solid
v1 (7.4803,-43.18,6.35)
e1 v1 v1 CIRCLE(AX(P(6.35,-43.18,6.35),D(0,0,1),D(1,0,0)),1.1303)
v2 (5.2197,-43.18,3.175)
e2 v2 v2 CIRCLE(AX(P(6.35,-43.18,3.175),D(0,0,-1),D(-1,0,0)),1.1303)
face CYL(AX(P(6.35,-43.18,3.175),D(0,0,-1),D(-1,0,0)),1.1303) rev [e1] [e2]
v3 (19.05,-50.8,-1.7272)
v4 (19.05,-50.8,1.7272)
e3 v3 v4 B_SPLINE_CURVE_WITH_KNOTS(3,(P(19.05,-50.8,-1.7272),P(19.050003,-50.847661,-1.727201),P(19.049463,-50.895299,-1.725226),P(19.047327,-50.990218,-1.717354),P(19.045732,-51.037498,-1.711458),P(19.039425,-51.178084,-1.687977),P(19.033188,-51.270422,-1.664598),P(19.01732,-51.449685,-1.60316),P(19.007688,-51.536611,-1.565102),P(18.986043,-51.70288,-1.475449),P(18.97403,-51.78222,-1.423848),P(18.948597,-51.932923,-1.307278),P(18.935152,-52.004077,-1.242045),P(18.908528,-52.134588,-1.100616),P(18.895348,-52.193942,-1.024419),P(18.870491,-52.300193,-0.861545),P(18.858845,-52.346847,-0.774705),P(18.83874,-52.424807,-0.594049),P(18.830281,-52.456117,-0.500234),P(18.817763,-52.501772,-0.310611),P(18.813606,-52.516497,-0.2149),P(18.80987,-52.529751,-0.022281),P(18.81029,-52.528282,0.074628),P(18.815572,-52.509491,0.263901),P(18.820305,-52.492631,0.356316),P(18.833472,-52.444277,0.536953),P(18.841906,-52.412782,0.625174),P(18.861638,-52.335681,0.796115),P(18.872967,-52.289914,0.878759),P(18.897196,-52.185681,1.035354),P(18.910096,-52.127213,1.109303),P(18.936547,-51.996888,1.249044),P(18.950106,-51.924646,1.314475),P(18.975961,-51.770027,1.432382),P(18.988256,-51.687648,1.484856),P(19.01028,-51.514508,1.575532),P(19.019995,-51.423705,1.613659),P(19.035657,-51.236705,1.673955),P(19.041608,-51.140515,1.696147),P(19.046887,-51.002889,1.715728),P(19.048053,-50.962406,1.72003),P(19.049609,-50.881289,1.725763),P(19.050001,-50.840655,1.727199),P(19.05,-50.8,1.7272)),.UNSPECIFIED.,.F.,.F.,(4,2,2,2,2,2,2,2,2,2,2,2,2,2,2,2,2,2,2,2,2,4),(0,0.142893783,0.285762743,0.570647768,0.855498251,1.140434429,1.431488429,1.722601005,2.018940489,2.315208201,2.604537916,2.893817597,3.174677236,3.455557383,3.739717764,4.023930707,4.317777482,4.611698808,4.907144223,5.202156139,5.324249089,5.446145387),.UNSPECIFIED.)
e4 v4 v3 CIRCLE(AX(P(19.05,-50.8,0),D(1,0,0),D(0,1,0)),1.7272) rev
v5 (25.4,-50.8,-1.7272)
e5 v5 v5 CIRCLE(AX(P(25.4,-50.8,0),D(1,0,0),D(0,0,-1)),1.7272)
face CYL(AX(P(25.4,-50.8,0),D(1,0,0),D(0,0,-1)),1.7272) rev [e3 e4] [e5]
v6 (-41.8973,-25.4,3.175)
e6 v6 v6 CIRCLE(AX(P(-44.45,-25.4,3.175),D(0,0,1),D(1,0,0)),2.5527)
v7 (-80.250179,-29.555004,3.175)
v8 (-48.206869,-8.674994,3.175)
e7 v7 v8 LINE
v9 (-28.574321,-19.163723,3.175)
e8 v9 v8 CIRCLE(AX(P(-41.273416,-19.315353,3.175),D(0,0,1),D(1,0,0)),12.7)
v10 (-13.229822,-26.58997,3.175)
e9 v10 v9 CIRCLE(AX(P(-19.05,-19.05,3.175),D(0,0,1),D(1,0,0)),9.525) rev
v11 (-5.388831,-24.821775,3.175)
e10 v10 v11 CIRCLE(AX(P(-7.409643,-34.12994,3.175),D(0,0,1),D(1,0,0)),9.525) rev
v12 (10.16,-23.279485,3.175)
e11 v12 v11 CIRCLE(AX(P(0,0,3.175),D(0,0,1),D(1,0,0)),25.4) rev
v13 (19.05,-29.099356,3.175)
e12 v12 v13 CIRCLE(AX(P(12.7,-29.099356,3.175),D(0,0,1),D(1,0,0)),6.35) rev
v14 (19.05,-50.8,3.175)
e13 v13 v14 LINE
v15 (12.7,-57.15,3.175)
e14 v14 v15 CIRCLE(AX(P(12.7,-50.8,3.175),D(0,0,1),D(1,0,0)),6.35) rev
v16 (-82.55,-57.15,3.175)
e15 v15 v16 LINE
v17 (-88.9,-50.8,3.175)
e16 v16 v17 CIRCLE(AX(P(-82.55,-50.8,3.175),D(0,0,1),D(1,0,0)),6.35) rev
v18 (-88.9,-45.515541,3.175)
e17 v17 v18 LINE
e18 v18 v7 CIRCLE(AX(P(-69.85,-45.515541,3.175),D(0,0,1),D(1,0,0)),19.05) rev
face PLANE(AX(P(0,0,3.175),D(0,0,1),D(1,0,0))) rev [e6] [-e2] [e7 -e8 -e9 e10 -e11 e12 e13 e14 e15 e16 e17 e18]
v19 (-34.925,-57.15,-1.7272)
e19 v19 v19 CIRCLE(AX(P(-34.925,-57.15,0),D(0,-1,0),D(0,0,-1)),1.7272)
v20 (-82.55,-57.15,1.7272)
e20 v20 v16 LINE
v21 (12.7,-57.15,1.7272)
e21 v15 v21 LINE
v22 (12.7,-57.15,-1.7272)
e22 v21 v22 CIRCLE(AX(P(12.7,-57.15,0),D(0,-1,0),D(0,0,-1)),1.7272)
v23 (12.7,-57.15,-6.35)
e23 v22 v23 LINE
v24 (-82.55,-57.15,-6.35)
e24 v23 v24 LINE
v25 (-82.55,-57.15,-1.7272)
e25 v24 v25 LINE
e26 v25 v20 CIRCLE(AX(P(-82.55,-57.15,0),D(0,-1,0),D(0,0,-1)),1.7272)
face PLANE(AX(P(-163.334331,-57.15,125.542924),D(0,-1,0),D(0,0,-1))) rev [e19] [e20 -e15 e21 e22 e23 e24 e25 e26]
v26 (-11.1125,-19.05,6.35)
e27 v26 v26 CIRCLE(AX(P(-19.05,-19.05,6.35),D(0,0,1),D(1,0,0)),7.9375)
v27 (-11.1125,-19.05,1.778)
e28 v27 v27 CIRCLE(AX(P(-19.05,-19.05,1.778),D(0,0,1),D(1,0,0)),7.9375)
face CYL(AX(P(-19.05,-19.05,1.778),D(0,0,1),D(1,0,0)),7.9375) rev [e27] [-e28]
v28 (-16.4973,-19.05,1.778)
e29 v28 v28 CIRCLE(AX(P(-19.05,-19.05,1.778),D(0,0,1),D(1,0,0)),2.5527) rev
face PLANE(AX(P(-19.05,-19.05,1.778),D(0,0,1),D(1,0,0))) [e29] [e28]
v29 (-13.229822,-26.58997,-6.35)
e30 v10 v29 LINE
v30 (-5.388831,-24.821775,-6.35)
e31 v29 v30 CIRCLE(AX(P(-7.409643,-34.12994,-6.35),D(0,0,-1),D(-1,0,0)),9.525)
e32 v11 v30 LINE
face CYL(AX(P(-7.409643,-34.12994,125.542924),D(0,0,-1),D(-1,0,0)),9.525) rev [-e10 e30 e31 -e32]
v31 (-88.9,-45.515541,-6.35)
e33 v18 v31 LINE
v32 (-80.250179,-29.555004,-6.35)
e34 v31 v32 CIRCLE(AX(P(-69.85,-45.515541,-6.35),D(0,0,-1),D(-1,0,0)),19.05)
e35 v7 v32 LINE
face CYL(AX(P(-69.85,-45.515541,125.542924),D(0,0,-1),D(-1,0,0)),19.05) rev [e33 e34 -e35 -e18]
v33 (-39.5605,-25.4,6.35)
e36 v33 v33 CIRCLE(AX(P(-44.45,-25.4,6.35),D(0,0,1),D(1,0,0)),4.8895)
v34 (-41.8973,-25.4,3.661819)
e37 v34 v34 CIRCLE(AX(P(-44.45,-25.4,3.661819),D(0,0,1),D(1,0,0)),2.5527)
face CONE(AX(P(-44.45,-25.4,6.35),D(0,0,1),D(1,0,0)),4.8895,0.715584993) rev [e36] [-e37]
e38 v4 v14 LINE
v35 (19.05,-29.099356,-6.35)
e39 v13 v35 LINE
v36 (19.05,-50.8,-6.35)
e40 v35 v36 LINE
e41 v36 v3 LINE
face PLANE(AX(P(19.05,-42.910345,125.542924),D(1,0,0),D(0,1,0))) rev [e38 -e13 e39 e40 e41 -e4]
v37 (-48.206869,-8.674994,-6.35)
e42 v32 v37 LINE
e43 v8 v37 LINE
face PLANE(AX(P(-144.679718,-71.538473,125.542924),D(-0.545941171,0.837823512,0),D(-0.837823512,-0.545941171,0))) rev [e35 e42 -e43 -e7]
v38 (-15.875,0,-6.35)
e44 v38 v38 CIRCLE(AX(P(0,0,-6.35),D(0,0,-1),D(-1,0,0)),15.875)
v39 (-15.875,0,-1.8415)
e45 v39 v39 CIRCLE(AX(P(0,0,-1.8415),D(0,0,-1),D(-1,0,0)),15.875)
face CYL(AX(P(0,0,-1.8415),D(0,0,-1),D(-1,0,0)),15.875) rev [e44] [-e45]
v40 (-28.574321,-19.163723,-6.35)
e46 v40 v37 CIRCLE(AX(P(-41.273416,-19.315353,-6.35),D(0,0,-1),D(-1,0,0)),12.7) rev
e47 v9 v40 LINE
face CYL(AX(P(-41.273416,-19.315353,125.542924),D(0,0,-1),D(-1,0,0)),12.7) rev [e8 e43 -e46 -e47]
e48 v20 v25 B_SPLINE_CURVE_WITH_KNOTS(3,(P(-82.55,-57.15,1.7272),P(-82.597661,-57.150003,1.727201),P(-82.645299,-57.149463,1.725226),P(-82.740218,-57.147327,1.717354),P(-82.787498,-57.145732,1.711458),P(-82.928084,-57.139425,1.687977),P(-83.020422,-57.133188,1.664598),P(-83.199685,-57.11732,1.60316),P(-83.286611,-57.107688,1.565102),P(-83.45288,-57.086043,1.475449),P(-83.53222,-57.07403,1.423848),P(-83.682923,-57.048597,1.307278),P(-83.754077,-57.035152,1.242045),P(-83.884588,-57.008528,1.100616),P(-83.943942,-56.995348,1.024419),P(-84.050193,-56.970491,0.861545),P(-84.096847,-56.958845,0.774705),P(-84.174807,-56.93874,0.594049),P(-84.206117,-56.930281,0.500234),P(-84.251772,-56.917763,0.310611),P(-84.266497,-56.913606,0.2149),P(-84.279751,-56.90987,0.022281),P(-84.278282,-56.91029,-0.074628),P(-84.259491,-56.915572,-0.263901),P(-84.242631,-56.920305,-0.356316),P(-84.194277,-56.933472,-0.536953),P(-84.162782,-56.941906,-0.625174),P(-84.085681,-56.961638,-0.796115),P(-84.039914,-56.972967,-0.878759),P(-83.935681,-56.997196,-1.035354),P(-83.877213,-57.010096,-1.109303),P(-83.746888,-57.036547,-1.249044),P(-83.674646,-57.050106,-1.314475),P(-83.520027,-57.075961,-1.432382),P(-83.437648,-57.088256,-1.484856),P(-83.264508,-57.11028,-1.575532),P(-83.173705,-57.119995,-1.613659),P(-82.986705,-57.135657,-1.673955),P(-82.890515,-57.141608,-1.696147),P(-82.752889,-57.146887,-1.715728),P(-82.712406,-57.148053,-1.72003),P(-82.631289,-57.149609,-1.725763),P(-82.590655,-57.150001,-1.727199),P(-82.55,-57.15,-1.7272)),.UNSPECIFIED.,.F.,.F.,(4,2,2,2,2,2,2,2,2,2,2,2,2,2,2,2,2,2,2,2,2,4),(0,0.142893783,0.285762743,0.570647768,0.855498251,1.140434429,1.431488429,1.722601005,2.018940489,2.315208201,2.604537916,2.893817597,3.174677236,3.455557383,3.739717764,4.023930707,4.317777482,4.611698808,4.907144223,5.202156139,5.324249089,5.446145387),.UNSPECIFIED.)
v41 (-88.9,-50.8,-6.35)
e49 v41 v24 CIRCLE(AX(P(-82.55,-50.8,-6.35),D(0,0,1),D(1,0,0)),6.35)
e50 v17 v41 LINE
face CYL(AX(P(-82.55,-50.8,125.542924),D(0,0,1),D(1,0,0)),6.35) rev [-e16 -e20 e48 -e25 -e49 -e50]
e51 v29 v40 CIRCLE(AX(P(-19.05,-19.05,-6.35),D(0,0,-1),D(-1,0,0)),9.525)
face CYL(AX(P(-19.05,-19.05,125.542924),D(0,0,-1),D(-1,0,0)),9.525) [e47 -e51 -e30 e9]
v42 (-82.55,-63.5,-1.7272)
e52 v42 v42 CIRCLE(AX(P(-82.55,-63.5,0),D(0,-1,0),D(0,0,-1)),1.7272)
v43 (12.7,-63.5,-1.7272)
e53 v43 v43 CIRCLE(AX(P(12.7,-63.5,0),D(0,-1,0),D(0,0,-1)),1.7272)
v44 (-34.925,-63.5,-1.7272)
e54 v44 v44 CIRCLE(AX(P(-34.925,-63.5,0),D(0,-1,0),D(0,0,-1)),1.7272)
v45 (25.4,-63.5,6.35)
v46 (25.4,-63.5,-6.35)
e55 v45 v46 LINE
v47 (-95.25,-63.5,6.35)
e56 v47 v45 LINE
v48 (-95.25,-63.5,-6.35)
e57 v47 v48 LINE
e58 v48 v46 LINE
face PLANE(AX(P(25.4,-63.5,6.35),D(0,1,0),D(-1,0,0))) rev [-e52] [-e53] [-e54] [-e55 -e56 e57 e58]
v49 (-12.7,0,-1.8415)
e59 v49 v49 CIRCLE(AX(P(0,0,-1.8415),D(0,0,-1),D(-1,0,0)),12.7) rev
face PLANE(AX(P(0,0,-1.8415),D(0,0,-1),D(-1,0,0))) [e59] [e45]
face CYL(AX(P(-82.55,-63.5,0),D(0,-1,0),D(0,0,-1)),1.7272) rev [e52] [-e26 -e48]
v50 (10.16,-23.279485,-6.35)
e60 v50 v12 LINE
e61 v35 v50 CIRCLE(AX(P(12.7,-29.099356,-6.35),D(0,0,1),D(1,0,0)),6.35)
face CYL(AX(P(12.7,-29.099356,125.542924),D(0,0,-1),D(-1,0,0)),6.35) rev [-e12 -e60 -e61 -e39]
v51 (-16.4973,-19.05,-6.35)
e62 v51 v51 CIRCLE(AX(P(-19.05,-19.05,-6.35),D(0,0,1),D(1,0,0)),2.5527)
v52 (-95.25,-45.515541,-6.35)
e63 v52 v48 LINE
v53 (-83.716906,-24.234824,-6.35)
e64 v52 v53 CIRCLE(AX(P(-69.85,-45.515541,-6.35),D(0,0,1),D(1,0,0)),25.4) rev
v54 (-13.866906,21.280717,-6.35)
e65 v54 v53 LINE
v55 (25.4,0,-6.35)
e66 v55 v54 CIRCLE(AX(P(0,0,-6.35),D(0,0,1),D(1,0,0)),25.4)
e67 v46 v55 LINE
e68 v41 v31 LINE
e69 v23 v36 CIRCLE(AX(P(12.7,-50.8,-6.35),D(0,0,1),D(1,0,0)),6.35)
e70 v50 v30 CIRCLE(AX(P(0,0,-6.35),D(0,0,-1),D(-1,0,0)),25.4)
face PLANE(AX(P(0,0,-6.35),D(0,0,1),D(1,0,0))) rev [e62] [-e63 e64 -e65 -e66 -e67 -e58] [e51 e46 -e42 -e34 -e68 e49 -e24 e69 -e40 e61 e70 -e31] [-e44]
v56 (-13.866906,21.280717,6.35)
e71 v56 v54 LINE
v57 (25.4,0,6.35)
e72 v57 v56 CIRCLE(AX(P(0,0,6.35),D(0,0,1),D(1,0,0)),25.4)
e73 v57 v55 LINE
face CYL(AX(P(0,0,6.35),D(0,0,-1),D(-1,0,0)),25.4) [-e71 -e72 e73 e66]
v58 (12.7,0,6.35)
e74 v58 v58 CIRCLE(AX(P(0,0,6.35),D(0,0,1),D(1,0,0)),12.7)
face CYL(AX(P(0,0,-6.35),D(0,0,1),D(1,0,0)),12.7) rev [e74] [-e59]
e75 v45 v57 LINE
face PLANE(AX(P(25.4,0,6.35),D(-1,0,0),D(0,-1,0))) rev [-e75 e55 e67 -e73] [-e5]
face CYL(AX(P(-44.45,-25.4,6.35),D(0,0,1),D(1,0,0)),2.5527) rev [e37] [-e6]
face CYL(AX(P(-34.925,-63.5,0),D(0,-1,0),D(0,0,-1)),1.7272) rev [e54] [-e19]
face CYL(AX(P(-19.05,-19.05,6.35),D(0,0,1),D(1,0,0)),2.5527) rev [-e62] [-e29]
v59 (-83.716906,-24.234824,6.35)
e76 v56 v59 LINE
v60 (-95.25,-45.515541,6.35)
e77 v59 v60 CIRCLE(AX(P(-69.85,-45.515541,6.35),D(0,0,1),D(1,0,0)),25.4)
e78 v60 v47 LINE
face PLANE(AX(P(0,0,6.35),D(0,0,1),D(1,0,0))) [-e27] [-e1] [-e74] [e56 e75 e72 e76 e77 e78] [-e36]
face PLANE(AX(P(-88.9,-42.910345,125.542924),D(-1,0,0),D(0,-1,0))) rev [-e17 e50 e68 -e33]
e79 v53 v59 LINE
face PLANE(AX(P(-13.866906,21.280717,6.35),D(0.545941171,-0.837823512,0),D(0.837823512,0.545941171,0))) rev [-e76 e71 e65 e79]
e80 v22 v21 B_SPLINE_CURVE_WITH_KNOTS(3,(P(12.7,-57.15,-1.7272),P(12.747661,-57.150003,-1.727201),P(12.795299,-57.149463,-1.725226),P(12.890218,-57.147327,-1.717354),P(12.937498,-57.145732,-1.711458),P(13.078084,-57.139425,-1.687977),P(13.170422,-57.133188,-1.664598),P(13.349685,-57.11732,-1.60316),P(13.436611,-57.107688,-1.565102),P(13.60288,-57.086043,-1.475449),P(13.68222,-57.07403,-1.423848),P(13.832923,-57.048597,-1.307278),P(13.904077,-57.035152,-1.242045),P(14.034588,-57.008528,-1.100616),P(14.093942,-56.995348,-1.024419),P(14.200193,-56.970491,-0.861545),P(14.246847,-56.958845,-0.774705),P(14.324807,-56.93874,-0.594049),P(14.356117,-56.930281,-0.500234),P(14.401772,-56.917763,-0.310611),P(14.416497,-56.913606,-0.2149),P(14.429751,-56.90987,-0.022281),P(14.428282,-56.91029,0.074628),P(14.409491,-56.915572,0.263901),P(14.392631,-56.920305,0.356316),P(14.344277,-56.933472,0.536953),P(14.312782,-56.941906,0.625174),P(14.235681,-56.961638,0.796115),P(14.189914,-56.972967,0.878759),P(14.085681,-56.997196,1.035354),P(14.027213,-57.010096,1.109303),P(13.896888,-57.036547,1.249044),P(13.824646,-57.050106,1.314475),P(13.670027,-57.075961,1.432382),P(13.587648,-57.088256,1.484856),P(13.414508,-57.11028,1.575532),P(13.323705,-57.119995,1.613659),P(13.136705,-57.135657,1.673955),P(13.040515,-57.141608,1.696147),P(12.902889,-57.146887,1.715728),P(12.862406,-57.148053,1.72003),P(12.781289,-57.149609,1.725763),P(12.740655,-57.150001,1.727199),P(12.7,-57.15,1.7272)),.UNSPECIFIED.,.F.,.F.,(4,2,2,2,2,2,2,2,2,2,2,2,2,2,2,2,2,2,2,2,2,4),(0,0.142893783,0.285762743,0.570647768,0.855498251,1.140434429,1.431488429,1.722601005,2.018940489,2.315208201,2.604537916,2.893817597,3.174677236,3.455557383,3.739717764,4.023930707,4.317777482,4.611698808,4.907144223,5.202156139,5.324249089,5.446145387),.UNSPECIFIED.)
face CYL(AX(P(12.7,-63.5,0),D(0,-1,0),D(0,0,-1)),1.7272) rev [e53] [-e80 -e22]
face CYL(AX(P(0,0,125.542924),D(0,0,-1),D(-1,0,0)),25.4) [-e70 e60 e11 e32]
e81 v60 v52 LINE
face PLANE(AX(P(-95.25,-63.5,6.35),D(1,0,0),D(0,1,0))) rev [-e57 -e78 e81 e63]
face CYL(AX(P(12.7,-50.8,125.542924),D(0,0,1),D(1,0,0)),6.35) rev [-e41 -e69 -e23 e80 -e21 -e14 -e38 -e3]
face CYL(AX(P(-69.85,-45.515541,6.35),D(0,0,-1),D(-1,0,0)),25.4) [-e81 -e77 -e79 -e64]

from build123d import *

# Parameters (mm, degrees)
BOSS_EXTRUDE1_DEPTH                             = 6.35
SKETCH4_R                                       = 12.7
CUT_EXTRUDE3_DEPTH                              = 116.178567885
SKETCH5_R                                       = 15.875
CUT_EXTRUDE4_DEPTH                              = 4.5085
FILLET1_R                                       = 25.4
F_8_32_TAPPED_HOLE2_D                           = 3.4544
F_8_32_TAPPED_HOLE2_DEPTH                       = 10.668
F_8_32_TAPPED_HOLE2_TIP                         = 1.037806461
F_1_4_20_TAPPED_HOLE1_D                         = 5.1054
SKETCH27_R                                      = 7.9375
CUT_EXTRUDE6_DEPTH                              = 4.572
CUT_EXTRUDE8_START                              = -9.525
CUT_EXTRUDE8_DEPTH                              = 9.525
FILLET2_R                                       = 6.35
F_8_32_TAPPED_HOLE1_D                           = 3.4544
F_8_32_TAPPED_HOLE1_DEPTH                       = 10.668
F_8_32_TAPPED_HOLE1_TIP                         = 1.037806461
F_4_40_TAPPED_HOLE1_D                           = 2.2606
F_4_40_TAPPED_HOLE1_DEPTH                       = 7.62
F_4_40_TAPPED_HOLE1_TIP                         = 0.679152758
CSK_FOR_10_FLAT_HEAD_MACHINE_SCREW1_D           = 5.1054
CSK_FOR_10_FLAT_HEAD_MACHINE_SCREW1_CSINK_D     = 9.779
CSK_FOR_10_FLAT_HEAD_MACHINE_SCREW1_CSINK_ANGLE = 82


with BuildPart() as part:
    # Sketch1 → Boss-Extrude1 (new, symmetric)
    with BuildSketch(Plane.XY):
        with BuildLine():
            Line((25.4, 0), (25.4, -63.5))
            Line((25.4, -63.5), (-95.25, -63.5))
            Line((-95.25, -63.5), (-95.25, -31.75))
            Line((-95.25, -31.75), (-13.866905739, 21.280717216))
            ThreePointArc((-13.866905739, 21.280717216), (12.10249136, 22.33136142), (25.4, 0))
        make_face()
    extrude(amount=BOSS_EXTRUDE1_DEPTH, both=True)

    # Sketch4 → Cut-Extrude3 (cut, through all)
    with BuildSketch(Plane.XY.offset(6.35)):
        Circle(SKETCH4_R)
    extrude(amount=-CUT_EXTRUDE3_DEPTH, mode=Mode.SUBTRACT)

    # Sketch5 → Cut-Extrude4 (cut)
    with BuildSketch(Plane(origin=(0, 0, -6.35), x_dir=(-1, 0, 0), z_dir=(0, 0, -1))):
        Circle(SKETCH5_R)
    extrude(amount=-CUT_EXTRUDE4_DEPTH, mode=Mode.SUBTRACT)

    # Fillet1
    fillet1_edges = [part.edges().sort_by_distance(p)[0] for p in [
        (-95.25, -31.75, 0),
    ]]
    fillet(fillet1_edges, radius=FILLET1_R)

    # #8-32 Tapped Hole2
    with Locations(Plane(origin=(25.4, 0, 0), x_dir=(0, 0, -1), z_dir=(1, 0, 0))):
        with Locations((0, -50.8)):
            Hole(F_8_32_TAPPED_HOLE2_D / 2, depth=F_8_32_TAPPED_HOLE2_DEPTH)
            with Locations((0, 0, -(F_8_32_TAPPED_HOLE2_DEPTH + F_8_32_TAPPED_HOLE2_TIP / 2))):  # 118° drill point
                Cone(0, F_8_32_TAPPED_HOLE2_D / 2, F_8_32_TAPPED_HOLE2_TIP, mode=Mode.SUBTRACT)

    # 1/4-20 Tapped Hole1 (through all)
    with Locations(Plane.XY.offset(6.35)):
        with Locations((-19.05, -19.05)):
            Hole(F_1_4_20_TAPPED_HOLE1_D / 2)

    # Sketch27 → Cut-Extrude6 (cut)
    with BuildSketch(Plane.XY.offset(6.35)):
        with Locations((-19.05, -19.05)):
            Circle(SKETCH27_R)
    extrude(amount=-CUT_EXTRUDE6_DEPTH, mode=Mode.SUBTRACT)

    # Sketch28 → Cut-Extrude8 (cut)
    with BuildSketch(Plane(origin=(0, 0, -6.35), x_dir=(-1, 0, 0), z_dir=(0, 0, -1)).offset(CUT_EXTRUDE8_START)):
        with BuildLine():
            ThreePointArc((5.38883143, -24.821774631), (-7.920985408, -24.133337734), (-19.05, -16.800520825))
            Line((-19.05, -16.800520825), (-19.05, -57.15))
            Line((-19.05, -57.15), (88.9, -57.15))
            Line((88.9, -57.15), (88.9, -45.515541418))
            ThreePointArc((88.9, -45.515541418), (86.598521065, -36.438672898), (80.250179304, -29.555003506))
            Line((80.250179304, -29.555003506), (48.206868735, -8.674994495))
            ThreePointArc((48.206868735, -8.674994495), (35.288934952, -8.113746603), (28.574321085, -19.163722759))
            ThreePointArc((28.574321085, -19.163722759), (23.199392186, -27.623690541), (13.229821608, -26.589970059))
            ThreePointArc((13.229821608, -26.589970059), (9.504977418, -24.838266448), (5.38883143, -24.821774631))
        make_face()
    extrude(amount=CUT_EXTRUDE8_DEPTH, mode=Mode.SUBTRACT)

    # Fillet2
    # the kernel refuses this fillet: 6.35 mm, written as the material it adds along each edge
    with BuildSketch(Plane(origin=(19.05, -57.15, 3.175), x_dir=(0, 1, 0), z_dir=(0, 0, -1))) as fillet2_piece_1_section:
        with BuildLine():
            CenterArc((FILLET2_R, -FILLET2_R), FILLET2_R, 90, 90)
            Line((0, -FILLET2_R), (0, 0))
            Line((0, 0), (FILLET2_R, 0))
        make_face()
    fillet2_piece_1 = extrude(amount=9.525, mode=Mode.PRIVATE)
    fillet2_piece_1 = fillet2_piece_1 - Plane(origin=(17.599243773, -50.8, 0), x_dir=(0, 0, 1), z_dir=(-1, 0, 0)) * Cylinder(1.7272, 45, mode=Mode.PRIVATE)
    add(fillet2_piece_1)
    with BuildSketch(Plane(origin=(-88.9, -57.15, 3.175), x_dir=(1, 0, 0), z_dir=(0, 0, -1))) as fillet2_piece_2:
        with BuildLine():
            CenterArc((FILLET2_R, -FILLET2_R), FILLET2_R, 90, 90)
            Line((0, -FILLET2_R), (0, 0))
            Line((0, 0), (FILLET2_R, 0))
        make_face()
    extrude(amount=9.525)
    with BuildSketch(Plane(origin=(19.05, -16.800520825, 3.175), x_dir=(-0.8081515274529607, -0.5889746248145555, 0), z_dir=(0, 0, -1))) as fillet2_piece_3:
        with BuildLine():
            CenterArc((12.375463834, -6.199333292), FILLET2_R, 102.506099706, 113.578178478)
            Line((7.243701634, -9.93932216), (0, 0))
            ThreePointArc((0, 0), (5.500206148, -0.60266683), (11.000412296, 0))
        make_face()
    extrude(amount=9.525)

    # #8-32 Tapped Hole1
    with Locations(Plane.XZ.offset(63.5)):
        with Locations((12.7, 0), (-34.925, 0), (-82.55, 0)):
            Hole(F_8_32_TAPPED_HOLE1_D / 2, depth=F_8_32_TAPPED_HOLE1_DEPTH)
            with Locations((0, 0, -(F_8_32_TAPPED_HOLE1_DEPTH + F_8_32_TAPPED_HOLE1_TIP / 2))):  # 118° drill point
                Cone(0, F_8_32_TAPPED_HOLE1_D / 2, F_8_32_TAPPED_HOLE1_TIP, mode=Mode.SUBTRACT)

    # #4-40 Tapped Hole1
    with Locations(Plane(origin=(0, 0, 3.175), x_dir=(-1, 0, 0), z_dir=(0, 0, -1))):
        with Locations((-6.35, -43.18)):
            Hole(F_4_40_TAPPED_HOLE1_D / 2, depth=F_4_40_TAPPED_HOLE1_DEPTH)
            with Locations((0, 0, -(F_4_40_TAPPED_HOLE1_DEPTH + F_4_40_TAPPED_HOLE1_TIP / 2))):  # 118° drill point
                Cone(0, F_4_40_TAPPED_HOLE1_D / 2, F_4_40_TAPPED_HOLE1_TIP, mode=Mode.SUBTRACT)

    # CSK for #10 Flat Head Machine Screw1 (through all)
    with Locations(Plane.XY.offset(6.35)):
        with Locations((-44.45, -25.4)):
            CounterSinkHole(CSK_FOR_10_FLAT_HEAD_MACHINE_SCREW1_D / 2, CSK_FOR_10_FLAT_HEAD_MACHINE_SCREW1_CSINK_D / 2, counter_sink_angle=CSK_FOR_10_FLAT_HEAD_MACHINE_SCREW1_CSINK_ANGLE)


solid = part.part
